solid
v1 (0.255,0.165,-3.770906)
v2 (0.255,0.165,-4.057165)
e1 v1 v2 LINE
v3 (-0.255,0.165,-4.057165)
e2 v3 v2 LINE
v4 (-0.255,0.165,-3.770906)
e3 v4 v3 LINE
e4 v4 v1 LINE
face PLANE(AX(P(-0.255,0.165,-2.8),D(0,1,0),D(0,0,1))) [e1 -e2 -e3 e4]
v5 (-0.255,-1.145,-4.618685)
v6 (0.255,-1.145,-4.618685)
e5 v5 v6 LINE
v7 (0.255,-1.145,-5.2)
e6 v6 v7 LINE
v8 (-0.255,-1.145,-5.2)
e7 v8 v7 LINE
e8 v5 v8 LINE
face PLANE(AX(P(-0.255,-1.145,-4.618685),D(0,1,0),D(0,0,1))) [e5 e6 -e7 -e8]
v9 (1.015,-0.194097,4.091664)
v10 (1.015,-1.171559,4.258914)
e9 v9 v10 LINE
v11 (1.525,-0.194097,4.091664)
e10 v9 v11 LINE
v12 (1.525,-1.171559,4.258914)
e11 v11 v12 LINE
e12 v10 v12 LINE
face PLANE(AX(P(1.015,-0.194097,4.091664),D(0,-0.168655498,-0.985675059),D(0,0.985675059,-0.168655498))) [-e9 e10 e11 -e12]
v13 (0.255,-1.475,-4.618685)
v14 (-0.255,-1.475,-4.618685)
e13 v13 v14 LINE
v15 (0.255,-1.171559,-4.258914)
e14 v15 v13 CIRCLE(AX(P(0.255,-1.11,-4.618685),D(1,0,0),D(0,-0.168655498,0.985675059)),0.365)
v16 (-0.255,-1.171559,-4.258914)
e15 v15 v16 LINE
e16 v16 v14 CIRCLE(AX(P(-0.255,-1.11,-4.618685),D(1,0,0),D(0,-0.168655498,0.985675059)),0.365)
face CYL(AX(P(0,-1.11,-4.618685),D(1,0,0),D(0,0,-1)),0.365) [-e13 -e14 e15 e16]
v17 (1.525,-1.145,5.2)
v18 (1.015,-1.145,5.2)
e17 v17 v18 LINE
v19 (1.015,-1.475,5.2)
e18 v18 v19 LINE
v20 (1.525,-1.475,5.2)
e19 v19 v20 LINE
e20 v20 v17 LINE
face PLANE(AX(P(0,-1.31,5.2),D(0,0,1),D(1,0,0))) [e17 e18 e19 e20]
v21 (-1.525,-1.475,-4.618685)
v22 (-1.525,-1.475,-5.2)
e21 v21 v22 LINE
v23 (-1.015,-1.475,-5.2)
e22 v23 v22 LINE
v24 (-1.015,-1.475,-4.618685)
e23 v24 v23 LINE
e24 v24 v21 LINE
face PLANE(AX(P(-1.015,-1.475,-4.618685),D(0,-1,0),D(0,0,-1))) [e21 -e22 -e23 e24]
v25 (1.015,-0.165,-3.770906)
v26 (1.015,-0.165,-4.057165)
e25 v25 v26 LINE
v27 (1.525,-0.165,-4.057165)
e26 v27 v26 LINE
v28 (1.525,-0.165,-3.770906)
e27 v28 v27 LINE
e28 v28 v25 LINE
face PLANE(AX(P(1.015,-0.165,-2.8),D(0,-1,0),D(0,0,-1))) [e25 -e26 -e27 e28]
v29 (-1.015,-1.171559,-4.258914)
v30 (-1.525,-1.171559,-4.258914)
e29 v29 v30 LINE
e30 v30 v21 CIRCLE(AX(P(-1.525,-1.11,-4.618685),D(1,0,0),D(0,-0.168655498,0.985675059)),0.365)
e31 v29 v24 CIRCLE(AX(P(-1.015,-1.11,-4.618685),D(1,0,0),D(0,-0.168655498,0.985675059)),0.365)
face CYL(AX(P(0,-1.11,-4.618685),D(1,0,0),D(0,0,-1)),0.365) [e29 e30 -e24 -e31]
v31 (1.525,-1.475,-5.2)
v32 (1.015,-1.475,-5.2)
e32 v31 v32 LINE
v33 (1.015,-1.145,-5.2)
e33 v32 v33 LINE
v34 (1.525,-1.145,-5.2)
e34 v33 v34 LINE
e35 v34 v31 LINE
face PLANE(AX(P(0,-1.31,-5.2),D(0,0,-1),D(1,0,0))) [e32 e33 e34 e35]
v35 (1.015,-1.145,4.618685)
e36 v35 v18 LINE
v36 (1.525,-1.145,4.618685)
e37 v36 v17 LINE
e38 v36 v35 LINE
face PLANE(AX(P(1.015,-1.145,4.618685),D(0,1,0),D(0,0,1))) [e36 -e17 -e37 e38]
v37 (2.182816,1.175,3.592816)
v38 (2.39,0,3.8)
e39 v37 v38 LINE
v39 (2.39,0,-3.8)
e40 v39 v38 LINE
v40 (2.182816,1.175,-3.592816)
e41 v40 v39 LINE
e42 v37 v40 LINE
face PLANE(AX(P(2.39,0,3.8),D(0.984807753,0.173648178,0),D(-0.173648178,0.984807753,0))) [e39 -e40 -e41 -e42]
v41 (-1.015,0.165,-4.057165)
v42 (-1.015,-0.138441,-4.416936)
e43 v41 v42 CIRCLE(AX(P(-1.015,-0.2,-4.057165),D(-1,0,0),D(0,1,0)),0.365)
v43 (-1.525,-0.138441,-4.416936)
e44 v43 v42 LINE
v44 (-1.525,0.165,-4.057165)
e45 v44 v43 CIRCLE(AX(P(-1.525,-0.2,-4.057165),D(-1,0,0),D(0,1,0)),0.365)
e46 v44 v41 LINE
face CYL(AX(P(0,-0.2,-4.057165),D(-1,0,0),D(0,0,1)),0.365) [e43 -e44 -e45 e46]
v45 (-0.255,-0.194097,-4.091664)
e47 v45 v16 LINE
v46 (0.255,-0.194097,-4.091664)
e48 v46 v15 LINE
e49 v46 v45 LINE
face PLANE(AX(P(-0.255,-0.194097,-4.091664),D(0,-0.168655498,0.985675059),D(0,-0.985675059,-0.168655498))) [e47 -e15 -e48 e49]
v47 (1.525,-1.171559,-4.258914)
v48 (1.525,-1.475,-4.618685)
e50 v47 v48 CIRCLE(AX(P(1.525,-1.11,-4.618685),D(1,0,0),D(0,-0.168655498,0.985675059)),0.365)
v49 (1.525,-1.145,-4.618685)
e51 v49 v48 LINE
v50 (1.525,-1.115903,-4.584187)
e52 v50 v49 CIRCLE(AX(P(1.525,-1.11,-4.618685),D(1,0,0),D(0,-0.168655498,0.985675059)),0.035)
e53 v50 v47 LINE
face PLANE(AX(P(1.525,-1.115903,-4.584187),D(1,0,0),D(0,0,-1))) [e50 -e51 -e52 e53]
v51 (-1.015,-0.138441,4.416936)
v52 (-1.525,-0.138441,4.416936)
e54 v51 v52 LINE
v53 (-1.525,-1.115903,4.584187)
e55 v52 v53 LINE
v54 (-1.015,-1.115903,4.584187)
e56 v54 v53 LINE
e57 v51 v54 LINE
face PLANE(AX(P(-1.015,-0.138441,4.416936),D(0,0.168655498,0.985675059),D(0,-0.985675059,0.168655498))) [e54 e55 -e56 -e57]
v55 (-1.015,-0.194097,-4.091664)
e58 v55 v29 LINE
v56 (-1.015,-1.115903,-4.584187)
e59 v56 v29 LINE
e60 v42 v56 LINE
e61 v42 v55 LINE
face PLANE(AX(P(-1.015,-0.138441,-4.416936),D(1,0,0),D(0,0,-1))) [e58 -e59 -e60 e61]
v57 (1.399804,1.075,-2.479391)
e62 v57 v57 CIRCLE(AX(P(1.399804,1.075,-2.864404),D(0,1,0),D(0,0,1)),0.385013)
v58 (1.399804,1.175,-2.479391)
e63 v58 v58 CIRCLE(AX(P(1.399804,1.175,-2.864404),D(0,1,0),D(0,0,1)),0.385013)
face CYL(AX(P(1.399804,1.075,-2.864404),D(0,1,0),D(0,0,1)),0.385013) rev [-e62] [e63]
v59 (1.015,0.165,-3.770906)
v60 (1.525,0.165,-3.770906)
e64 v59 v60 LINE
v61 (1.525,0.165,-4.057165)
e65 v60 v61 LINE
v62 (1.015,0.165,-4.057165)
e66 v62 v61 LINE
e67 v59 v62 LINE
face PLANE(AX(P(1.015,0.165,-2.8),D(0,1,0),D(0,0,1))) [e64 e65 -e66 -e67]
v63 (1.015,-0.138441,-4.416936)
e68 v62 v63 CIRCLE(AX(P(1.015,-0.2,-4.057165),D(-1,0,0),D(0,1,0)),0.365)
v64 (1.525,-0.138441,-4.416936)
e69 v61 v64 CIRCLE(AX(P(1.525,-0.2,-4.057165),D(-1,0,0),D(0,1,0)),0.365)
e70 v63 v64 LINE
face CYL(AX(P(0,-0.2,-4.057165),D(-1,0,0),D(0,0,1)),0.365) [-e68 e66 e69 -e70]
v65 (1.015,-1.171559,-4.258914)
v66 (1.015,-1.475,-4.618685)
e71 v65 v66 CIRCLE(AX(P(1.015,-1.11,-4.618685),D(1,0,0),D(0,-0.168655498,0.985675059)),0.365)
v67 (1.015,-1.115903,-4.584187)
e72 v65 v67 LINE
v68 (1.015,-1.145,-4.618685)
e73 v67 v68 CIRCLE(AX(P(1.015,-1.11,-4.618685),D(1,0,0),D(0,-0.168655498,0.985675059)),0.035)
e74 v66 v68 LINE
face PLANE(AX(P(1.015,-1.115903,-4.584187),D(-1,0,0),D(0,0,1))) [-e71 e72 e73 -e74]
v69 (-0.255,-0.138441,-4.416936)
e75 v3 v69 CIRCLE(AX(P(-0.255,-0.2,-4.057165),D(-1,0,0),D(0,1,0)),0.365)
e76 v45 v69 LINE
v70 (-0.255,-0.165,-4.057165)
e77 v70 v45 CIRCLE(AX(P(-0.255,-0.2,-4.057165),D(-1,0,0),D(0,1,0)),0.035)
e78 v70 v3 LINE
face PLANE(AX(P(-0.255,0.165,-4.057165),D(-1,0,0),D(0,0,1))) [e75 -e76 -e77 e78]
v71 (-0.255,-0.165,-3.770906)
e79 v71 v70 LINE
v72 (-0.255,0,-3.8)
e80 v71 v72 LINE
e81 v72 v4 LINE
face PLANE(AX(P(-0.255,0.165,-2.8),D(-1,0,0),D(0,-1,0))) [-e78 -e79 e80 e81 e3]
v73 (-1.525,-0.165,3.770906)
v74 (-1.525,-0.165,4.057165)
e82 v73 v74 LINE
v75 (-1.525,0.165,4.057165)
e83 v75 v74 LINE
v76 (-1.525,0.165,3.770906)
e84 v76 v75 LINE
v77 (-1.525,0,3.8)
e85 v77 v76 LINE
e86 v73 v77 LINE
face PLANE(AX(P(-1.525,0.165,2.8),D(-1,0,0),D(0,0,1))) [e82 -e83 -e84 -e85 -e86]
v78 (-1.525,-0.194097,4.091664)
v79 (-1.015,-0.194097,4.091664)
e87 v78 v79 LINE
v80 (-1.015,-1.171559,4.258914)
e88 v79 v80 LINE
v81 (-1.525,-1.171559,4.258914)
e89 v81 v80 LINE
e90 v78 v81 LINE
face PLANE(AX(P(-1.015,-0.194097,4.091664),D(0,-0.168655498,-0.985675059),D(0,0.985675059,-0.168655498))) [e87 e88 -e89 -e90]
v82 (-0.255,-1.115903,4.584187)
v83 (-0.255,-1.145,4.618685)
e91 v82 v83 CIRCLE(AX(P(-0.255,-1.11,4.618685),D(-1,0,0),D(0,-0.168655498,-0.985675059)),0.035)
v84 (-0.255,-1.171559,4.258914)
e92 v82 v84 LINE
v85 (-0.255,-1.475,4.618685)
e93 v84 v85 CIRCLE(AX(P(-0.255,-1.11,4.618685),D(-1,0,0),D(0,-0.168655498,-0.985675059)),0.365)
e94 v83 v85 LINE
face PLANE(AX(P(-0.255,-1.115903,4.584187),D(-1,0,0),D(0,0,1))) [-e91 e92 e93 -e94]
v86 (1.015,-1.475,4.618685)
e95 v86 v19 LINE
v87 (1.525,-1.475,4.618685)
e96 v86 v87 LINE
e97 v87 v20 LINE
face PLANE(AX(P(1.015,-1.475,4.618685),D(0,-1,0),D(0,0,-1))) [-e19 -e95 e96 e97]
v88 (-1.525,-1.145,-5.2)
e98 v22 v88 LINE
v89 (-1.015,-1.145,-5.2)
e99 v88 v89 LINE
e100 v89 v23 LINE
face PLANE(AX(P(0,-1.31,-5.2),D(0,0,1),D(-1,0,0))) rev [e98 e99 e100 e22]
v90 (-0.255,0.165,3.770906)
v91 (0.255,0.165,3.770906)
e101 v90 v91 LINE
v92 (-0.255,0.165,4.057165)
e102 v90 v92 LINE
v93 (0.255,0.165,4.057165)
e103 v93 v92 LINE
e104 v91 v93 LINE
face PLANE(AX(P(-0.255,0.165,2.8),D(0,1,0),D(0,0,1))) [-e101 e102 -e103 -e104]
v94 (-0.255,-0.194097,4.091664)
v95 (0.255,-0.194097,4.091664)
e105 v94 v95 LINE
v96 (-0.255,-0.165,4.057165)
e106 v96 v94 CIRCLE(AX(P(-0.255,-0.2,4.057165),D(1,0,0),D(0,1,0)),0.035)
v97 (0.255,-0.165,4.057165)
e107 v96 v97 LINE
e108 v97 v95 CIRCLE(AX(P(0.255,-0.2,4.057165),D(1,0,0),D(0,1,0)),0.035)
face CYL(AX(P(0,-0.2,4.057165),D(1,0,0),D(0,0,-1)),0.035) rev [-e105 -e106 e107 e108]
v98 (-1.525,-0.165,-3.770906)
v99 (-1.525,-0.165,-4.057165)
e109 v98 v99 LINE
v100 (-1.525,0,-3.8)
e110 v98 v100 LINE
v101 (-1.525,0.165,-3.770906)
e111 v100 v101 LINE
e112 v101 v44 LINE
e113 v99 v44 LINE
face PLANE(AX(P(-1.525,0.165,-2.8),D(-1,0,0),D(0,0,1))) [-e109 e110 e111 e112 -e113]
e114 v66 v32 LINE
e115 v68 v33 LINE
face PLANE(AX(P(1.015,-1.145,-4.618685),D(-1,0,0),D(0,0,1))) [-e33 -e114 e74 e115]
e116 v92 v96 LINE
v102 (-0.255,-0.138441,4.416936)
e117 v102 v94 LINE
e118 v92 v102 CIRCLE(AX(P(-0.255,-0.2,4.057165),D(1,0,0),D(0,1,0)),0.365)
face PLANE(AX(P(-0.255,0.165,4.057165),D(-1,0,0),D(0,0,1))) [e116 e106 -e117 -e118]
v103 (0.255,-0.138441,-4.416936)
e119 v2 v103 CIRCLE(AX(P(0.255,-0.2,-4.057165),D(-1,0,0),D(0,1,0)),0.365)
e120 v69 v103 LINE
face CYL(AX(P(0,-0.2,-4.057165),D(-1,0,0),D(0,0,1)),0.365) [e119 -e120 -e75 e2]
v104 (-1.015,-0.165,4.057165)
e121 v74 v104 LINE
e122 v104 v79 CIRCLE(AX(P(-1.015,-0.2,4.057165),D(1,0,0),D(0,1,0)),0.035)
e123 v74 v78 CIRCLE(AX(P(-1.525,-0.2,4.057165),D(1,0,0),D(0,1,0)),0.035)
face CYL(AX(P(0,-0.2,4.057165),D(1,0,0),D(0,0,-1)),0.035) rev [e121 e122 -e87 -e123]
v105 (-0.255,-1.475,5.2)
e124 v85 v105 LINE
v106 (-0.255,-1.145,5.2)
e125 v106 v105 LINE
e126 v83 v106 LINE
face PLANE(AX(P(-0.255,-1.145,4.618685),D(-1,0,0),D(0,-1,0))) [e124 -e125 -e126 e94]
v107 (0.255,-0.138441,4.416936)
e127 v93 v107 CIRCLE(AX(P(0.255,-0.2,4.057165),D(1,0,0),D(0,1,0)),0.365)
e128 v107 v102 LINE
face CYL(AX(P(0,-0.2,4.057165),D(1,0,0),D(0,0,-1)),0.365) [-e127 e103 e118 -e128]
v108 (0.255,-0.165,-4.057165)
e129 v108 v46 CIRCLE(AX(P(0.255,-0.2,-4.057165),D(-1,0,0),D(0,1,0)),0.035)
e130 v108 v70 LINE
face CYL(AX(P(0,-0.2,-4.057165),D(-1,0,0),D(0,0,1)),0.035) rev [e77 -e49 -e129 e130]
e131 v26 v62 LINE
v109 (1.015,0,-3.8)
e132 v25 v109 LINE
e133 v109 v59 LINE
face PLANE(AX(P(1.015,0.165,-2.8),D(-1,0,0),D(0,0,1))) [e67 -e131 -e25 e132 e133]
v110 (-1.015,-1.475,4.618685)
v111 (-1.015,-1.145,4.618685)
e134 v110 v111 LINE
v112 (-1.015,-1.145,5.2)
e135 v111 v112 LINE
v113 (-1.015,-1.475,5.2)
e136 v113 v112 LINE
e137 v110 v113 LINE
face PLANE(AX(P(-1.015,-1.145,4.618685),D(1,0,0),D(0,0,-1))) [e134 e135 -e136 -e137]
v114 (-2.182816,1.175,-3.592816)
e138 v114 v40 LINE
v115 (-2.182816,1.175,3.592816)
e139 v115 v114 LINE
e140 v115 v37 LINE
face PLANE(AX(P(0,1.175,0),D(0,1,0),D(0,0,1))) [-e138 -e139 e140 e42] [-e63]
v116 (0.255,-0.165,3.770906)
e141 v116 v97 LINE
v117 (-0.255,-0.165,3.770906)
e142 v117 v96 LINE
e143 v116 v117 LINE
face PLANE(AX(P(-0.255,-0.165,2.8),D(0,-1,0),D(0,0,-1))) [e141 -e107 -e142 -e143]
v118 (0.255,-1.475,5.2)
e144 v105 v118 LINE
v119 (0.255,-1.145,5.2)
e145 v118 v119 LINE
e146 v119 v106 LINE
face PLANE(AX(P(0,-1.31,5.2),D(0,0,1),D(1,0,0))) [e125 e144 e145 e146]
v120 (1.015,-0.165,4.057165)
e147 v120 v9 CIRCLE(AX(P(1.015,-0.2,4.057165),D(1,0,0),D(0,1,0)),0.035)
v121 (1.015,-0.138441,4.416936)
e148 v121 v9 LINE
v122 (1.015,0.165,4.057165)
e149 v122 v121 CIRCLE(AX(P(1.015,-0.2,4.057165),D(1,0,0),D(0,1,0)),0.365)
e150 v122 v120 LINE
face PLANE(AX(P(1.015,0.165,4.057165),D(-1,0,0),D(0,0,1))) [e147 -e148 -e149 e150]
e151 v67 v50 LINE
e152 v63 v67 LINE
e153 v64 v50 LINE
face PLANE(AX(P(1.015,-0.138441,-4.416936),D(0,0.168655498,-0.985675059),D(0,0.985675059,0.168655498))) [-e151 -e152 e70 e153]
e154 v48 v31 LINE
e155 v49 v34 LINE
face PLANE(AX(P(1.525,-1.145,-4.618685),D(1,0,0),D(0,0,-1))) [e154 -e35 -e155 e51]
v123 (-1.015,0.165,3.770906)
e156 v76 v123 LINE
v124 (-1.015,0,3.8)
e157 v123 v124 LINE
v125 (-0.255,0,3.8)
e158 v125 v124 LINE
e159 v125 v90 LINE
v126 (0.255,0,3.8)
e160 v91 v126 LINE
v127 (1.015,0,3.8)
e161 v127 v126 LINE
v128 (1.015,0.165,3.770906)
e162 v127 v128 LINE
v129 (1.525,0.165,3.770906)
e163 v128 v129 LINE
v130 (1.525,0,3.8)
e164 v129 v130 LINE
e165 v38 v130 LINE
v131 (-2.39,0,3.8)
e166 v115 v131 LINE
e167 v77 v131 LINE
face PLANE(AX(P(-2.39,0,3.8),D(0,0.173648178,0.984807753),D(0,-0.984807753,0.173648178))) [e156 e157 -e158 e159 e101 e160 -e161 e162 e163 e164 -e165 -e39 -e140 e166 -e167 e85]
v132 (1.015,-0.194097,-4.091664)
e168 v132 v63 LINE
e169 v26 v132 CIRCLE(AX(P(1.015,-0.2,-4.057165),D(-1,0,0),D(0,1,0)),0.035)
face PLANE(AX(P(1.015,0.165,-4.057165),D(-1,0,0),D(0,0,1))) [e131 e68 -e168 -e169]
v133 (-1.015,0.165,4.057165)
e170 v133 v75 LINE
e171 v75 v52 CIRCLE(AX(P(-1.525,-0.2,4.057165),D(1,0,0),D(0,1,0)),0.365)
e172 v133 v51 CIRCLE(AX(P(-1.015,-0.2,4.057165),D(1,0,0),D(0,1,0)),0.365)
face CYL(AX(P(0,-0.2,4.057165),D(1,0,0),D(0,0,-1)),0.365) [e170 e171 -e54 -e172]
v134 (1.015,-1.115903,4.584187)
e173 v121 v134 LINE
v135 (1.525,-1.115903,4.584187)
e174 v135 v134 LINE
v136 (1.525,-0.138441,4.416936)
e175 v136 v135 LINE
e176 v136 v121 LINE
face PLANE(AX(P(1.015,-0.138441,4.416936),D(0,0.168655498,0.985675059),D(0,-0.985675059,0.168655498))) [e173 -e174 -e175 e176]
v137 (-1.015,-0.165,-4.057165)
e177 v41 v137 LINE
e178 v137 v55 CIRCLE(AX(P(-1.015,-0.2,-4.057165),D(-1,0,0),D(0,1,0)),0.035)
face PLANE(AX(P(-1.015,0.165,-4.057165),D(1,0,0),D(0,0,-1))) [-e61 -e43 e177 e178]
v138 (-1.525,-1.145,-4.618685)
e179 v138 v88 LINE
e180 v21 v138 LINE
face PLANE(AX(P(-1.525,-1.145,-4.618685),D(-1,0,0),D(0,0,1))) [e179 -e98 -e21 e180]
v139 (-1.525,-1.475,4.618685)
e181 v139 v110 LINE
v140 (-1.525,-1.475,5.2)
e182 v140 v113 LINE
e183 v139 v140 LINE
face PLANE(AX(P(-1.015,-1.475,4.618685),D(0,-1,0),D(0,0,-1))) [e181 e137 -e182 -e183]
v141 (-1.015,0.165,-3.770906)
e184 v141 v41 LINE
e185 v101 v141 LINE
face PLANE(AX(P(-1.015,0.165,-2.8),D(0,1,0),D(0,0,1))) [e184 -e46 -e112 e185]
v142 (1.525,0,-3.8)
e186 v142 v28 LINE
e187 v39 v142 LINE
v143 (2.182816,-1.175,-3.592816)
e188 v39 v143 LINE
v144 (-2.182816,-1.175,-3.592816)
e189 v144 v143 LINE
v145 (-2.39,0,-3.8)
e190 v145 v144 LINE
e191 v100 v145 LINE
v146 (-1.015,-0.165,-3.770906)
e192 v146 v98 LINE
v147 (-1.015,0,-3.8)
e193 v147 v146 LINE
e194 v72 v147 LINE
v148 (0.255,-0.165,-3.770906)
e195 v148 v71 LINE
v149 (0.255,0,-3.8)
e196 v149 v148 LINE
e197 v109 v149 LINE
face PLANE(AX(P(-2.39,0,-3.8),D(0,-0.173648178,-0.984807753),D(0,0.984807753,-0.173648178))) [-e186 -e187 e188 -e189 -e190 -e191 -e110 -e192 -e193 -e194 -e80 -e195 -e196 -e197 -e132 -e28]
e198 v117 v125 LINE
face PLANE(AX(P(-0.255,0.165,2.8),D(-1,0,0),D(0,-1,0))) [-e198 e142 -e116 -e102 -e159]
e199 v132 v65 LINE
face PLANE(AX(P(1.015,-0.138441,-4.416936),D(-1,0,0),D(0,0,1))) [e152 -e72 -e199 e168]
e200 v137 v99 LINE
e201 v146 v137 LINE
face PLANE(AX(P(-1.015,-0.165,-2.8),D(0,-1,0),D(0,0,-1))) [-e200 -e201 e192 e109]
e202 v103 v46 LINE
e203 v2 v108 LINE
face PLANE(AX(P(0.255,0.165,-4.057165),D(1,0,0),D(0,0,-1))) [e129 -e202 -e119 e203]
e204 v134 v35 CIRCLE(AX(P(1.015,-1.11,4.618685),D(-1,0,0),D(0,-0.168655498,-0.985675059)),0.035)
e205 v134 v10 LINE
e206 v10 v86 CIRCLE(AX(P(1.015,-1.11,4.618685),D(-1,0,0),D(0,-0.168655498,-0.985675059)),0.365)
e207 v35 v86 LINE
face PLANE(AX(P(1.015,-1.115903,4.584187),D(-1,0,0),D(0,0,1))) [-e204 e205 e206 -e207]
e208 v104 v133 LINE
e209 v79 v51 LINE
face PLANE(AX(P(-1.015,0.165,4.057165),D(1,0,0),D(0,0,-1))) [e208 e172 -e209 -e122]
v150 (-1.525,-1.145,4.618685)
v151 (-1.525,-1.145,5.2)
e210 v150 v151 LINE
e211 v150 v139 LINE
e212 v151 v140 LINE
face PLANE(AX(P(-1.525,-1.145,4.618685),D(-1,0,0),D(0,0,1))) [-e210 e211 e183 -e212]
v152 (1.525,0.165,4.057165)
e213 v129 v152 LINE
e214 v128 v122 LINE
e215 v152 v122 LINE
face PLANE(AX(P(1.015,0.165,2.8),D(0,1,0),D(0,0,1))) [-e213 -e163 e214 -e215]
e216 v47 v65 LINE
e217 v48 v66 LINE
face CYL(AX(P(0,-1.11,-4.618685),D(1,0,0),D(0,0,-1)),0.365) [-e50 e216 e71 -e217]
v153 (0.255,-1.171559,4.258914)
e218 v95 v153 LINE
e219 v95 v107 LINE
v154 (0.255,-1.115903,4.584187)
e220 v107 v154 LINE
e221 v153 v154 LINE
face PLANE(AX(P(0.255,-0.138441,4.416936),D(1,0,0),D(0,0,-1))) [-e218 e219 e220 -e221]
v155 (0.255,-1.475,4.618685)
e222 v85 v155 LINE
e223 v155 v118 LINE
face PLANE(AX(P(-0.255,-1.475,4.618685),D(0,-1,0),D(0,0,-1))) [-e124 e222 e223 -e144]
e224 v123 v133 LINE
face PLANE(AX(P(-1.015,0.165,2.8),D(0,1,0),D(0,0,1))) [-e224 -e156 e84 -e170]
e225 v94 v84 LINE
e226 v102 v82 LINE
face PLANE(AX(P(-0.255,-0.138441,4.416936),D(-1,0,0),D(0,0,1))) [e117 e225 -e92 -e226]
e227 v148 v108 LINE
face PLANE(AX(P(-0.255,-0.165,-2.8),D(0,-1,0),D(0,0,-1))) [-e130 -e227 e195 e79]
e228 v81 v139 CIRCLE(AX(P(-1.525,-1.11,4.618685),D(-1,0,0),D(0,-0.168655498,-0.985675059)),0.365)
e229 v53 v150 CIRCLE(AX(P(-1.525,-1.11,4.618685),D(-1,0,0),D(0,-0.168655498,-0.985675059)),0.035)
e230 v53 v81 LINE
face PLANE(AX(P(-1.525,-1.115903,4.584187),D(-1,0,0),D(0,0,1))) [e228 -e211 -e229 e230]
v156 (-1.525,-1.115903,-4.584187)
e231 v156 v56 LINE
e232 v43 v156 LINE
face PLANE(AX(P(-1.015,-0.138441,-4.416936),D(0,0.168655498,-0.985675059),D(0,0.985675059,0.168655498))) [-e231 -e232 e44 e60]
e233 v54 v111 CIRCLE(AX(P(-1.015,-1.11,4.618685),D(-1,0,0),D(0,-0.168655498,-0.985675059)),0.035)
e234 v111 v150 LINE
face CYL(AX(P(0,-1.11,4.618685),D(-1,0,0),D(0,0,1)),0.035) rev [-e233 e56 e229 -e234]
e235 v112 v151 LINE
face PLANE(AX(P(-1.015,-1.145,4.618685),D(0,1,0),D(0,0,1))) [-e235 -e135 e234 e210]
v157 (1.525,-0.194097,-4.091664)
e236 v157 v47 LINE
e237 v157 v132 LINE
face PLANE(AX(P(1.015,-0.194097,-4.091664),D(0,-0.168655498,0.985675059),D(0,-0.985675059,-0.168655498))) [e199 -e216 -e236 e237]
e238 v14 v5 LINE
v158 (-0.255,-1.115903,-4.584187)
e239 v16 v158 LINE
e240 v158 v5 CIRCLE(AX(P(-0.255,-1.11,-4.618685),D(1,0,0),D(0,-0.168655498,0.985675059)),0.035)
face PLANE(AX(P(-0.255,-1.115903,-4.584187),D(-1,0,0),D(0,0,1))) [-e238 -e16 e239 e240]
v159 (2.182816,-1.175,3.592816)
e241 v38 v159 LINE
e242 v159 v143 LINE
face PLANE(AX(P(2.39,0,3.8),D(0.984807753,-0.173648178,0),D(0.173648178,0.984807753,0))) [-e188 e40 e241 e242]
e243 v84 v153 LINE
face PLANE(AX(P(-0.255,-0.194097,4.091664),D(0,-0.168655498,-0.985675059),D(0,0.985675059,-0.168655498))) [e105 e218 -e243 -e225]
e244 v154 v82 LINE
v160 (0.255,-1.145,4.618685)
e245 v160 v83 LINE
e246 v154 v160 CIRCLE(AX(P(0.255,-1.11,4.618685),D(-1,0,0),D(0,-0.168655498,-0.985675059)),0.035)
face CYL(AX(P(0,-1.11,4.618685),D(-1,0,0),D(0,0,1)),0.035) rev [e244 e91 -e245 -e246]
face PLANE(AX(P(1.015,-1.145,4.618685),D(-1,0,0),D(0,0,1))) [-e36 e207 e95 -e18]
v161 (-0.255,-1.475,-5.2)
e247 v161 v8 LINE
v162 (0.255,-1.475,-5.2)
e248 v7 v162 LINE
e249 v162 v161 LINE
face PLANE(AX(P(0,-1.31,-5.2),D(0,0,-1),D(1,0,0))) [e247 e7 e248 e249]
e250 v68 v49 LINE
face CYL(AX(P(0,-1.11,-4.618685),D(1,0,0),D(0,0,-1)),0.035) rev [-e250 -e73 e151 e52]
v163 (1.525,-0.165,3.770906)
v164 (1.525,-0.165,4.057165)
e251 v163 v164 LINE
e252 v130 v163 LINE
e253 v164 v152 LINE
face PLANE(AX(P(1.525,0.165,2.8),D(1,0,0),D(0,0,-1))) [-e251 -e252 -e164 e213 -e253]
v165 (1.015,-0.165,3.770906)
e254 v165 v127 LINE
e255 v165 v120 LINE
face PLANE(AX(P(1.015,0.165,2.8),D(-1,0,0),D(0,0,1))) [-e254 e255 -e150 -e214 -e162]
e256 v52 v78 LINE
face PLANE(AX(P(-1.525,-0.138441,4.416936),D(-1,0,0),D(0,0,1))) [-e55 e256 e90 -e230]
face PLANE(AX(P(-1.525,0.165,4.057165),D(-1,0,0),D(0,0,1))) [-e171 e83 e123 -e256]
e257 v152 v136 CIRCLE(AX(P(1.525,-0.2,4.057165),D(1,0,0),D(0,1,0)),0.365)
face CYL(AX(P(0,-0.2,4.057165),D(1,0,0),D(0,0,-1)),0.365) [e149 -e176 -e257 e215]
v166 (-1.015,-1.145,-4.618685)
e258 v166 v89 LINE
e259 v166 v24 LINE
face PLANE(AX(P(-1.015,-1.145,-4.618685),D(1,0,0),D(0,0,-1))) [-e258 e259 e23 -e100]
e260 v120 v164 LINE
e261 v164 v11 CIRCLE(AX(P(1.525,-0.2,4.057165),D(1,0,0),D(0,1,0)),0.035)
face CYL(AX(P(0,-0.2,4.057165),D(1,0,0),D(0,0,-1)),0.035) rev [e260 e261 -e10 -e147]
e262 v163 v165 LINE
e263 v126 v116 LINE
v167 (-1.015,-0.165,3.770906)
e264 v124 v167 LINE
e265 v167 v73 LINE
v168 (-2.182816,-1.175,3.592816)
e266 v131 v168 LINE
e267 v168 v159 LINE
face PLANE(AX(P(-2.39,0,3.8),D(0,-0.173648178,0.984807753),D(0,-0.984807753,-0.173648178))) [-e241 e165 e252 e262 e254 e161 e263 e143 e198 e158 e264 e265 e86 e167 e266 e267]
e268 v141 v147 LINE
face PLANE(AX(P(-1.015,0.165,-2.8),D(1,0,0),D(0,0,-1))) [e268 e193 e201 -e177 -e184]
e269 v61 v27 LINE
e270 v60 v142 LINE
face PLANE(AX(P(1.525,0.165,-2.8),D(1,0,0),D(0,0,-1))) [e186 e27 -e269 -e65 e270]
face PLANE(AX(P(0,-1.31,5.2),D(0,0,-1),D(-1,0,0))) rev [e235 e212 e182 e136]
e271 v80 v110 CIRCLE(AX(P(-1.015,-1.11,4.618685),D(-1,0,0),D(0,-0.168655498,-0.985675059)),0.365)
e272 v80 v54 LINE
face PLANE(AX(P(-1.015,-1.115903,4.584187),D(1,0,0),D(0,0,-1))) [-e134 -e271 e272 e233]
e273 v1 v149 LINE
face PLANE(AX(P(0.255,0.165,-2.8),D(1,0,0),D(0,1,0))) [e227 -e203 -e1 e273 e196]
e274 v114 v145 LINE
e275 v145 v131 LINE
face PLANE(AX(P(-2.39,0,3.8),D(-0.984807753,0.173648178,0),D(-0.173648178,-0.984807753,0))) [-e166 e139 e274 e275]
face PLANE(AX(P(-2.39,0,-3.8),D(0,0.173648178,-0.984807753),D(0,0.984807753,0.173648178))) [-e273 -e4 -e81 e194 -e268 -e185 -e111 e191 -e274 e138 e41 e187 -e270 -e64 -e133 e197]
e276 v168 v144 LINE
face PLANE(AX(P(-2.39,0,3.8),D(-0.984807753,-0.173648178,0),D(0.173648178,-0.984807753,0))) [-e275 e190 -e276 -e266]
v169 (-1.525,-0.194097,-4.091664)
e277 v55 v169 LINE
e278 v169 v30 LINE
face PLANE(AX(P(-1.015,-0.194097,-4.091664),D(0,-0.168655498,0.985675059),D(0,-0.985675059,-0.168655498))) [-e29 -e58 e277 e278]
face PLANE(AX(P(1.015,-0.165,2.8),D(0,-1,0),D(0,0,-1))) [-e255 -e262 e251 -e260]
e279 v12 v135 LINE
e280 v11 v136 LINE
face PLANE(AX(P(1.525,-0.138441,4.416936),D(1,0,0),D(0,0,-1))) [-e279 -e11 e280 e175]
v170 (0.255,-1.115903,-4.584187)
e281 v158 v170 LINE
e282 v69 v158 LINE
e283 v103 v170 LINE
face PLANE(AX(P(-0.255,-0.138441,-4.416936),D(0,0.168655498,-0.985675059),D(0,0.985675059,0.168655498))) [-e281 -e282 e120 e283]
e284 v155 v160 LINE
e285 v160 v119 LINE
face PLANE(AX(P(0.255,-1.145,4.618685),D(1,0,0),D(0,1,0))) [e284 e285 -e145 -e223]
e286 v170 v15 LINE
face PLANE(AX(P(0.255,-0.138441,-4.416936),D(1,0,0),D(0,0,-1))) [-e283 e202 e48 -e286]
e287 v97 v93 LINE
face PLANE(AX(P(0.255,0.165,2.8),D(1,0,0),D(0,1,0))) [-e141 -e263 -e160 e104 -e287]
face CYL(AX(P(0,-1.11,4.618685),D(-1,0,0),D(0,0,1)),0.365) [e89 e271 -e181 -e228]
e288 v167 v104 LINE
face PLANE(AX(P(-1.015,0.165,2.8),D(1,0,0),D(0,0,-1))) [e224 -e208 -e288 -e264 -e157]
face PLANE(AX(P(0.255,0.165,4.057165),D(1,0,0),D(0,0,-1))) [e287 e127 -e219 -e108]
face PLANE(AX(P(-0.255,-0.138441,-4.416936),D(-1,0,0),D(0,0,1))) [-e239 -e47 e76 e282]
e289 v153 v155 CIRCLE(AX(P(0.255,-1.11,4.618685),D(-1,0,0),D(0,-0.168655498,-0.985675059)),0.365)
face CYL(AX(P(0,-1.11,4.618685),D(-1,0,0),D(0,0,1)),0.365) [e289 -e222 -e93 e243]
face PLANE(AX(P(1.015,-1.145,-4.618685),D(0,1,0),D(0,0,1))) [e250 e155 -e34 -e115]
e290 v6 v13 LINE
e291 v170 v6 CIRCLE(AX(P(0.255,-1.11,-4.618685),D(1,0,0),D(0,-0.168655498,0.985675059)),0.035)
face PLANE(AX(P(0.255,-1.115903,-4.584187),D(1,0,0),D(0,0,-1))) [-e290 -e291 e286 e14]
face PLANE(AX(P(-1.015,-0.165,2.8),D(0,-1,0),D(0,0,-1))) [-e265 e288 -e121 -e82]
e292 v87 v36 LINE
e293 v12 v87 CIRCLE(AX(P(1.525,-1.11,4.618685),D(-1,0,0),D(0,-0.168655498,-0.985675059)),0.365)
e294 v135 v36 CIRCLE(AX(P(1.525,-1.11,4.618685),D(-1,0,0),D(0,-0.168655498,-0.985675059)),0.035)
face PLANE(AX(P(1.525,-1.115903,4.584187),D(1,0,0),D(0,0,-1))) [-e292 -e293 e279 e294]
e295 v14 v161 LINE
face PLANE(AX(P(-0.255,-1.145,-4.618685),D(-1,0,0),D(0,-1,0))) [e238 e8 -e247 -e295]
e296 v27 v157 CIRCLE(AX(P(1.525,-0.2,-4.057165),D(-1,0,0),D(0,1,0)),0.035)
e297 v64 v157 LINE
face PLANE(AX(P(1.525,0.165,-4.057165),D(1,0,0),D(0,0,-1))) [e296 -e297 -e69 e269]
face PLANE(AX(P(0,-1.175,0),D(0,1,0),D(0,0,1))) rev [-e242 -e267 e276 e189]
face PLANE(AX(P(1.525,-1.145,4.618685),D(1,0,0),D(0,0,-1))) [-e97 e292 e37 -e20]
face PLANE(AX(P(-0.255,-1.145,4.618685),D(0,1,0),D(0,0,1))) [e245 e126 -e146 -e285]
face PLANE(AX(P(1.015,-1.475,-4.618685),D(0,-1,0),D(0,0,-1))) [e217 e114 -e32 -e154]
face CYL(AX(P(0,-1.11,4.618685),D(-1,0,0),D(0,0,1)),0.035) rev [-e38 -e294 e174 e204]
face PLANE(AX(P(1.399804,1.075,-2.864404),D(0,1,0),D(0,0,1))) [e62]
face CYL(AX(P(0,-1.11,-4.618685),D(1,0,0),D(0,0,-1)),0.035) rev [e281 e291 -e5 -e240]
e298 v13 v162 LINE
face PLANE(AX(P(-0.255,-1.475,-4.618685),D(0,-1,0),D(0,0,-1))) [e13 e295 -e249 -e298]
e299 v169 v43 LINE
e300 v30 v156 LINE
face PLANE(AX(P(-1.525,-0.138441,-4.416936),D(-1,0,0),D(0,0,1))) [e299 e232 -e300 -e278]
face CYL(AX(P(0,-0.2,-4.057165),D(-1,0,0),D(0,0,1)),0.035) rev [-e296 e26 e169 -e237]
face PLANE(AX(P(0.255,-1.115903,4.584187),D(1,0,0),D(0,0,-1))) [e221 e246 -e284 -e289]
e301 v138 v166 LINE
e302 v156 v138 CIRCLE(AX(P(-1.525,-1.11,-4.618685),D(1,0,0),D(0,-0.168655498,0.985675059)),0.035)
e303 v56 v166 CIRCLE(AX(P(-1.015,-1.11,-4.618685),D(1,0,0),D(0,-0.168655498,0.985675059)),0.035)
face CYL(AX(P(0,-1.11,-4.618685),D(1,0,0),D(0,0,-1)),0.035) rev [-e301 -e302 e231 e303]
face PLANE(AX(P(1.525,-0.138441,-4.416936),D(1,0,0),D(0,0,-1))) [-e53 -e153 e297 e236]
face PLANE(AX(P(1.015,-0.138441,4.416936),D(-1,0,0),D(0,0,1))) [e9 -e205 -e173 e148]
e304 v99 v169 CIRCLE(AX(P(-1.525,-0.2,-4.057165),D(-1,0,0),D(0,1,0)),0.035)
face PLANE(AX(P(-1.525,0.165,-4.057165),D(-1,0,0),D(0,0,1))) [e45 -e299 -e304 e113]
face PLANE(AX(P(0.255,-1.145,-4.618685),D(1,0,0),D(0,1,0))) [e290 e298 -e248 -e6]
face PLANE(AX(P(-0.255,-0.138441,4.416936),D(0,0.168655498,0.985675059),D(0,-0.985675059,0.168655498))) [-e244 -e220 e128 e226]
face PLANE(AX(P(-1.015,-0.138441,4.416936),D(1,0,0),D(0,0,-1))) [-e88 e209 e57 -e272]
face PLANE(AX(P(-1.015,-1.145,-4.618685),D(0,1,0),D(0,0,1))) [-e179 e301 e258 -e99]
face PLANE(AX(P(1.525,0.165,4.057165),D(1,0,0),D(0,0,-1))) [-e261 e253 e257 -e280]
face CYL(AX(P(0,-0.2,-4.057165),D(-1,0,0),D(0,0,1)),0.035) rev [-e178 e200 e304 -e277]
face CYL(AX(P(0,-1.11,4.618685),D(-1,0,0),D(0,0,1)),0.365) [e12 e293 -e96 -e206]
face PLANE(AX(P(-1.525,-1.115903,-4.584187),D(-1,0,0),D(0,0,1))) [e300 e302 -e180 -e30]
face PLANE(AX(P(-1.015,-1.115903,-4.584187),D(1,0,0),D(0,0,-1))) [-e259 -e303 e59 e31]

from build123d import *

# Parameters (mm, degrees)
SKETCH1_W           = 4.78
SKETCH1_H           = 7.6
BOSS_EXTRUDE1_DEPTH = 1.175
DRAFT1_START        = -2.39
DRAFT1_DEPTH        = 4.78
DRAFT1_START_2      = -5
DRAFT1_2_DEPTH      = 10
DRAFT2_START        = -2.39
DRAFT2_DEPTH        = 4.78
DRAFT2_START_2      = -5
DRAFT2_2_DEPTH      = 10
SKETCH2_W           = 0.51
SKETCH2_H           = 0.33
SKETCH5_R           = 0.385012942
CUT_EXTRUDE1_DEPTH  = 0.1


with BuildPart() as part:
    # Sketch1 → Boss-Extrude1 (new, symmetric)
    with BuildSketch(Plane(origin=(0, 0, 0), x_dir=(1, 0, 0), z_dir=(0, 1, 0))):
        Rectangle(SKETCH1_W, SKETCH1_H)
    extrude(amount=BOSS_EXTRUDE1_DEPTH, both=True)

    # Draft1: read off the stored shape, not the designer's step
    # Draft1 outline → Draft1 (cut)
    with BuildSketch(Plane.YZ.offset(DRAFT1_START)):
        Polygon((0, 3.8), (1.175, 3.592815798), (1.175, 3.8), align=None)
        Polygon((1.175, -3.592815798), (0, -3.8), (1.175, -3.8), align=None)
    extrude(amount=DRAFT1_DEPTH, mode=Mode.SUBTRACT)

    # Draft1 2 outline → Draft1 2 (cut)
    with BuildSketch(Plane.XY.offset(DRAFT1_START_2)):
        Polygon((2.39, 1.175), (2.182815798, 1.175), (2.39, 0), align=None)
        Polygon((-2.39, 0), (-2.182815798, 1.175), (-2.39, 1.175), align=None)
    extrude(amount=DRAFT1_2_DEPTH, mode=Mode.SUBTRACT)

    # Draft2: read off the stored shape, not the designer's step
    # Draft2 outline → Draft2 (cut)
    with BuildSketch(Plane.YZ.offset(DRAFT2_START)):
        Polygon((0, -3.8), (-1.175, -3.592815798), (-1.175, -3.8), align=None)
        Polygon((-1.175, 3.592815798), (0, 3.8), (-1.175, 3.8), align=None)
    extrude(amount=DRAFT2_DEPTH, mode=Mode.SUBTRACT)

    # Draft2 2 outline → Draft2 2 (cut)
    with BuildSketch(Plane.XY.offset(DRAFT2_START_2)):
        Polygon((-2.39, -1.175), (-2.182815798, -1.175), (-2.39, 0), align=None)
        Polygon((2.39, 0), (2.182815798, -1.175), (2.39, -1.175), align=None)
    extrude(amount=DRAFT2_2_DEPTH, mode=Mode.SUBTRACT)

    # Sweep1: sweep along a path in Sketch3
    with BuildLine(Plane(origin=(0, 0, 0), x_dir=(0, 0, -1), z_dir=(1, 0, 0))) as sweep1_path:
        Line((-5.2, -1.31), (-4.618685307, -1.31))
        ThreePointArc((-4.618685307, -1.31), (-4.489740009, -1.262882667), (-4.421550295, -1.1437311))
        Line((-4.421550295, -1.1437311), (-4.254300072, -0.1662689))
        ThreePointArc((-4.254300072, -0.1662689), (-4.186110358, -0.047117333), (-4.05716506, 0))
        Line((-4.05716506, 0), (-3.8, 0))
        Line((-3.8, 0), (-2.8, 0))
    # Sketch2 → Sweep1 (sweep)
    with BuildSketch(Plane.XY.offset(3.8)):
        Rectangle(SKETCH2_W, SKETCH2_H)
        with Locations((1.27, 0)):
            Rectangle(SKETCH2_W, SKETCH2_H)
        with Locations((-1.27, 0)):
            Rectangle(SKETCH2_W, SKETCH2_H)
    sweep1 = sweep(path=sweep1_path.line)

    # Mirror1: Sweep1 across plane
    add(sweep1.mirror(Plane.XY))

    # Sketch5 → Cut-Extrude1 (cut)
    with BuildSketch(Plane(origin=(0, 1.175, 0), x_dir=(1, 0, 0), z_dir=(0, 1, 0))):
        with Locations(Location((1.399803613, 2.864403821, 0), (0, 0, 270))):
            Circle(SKETCH5_R)
    extrude(amount=-CUT_EXTRUDE1_DEPTH, mode=Mode.SUBTRACT)


solid = part.part
